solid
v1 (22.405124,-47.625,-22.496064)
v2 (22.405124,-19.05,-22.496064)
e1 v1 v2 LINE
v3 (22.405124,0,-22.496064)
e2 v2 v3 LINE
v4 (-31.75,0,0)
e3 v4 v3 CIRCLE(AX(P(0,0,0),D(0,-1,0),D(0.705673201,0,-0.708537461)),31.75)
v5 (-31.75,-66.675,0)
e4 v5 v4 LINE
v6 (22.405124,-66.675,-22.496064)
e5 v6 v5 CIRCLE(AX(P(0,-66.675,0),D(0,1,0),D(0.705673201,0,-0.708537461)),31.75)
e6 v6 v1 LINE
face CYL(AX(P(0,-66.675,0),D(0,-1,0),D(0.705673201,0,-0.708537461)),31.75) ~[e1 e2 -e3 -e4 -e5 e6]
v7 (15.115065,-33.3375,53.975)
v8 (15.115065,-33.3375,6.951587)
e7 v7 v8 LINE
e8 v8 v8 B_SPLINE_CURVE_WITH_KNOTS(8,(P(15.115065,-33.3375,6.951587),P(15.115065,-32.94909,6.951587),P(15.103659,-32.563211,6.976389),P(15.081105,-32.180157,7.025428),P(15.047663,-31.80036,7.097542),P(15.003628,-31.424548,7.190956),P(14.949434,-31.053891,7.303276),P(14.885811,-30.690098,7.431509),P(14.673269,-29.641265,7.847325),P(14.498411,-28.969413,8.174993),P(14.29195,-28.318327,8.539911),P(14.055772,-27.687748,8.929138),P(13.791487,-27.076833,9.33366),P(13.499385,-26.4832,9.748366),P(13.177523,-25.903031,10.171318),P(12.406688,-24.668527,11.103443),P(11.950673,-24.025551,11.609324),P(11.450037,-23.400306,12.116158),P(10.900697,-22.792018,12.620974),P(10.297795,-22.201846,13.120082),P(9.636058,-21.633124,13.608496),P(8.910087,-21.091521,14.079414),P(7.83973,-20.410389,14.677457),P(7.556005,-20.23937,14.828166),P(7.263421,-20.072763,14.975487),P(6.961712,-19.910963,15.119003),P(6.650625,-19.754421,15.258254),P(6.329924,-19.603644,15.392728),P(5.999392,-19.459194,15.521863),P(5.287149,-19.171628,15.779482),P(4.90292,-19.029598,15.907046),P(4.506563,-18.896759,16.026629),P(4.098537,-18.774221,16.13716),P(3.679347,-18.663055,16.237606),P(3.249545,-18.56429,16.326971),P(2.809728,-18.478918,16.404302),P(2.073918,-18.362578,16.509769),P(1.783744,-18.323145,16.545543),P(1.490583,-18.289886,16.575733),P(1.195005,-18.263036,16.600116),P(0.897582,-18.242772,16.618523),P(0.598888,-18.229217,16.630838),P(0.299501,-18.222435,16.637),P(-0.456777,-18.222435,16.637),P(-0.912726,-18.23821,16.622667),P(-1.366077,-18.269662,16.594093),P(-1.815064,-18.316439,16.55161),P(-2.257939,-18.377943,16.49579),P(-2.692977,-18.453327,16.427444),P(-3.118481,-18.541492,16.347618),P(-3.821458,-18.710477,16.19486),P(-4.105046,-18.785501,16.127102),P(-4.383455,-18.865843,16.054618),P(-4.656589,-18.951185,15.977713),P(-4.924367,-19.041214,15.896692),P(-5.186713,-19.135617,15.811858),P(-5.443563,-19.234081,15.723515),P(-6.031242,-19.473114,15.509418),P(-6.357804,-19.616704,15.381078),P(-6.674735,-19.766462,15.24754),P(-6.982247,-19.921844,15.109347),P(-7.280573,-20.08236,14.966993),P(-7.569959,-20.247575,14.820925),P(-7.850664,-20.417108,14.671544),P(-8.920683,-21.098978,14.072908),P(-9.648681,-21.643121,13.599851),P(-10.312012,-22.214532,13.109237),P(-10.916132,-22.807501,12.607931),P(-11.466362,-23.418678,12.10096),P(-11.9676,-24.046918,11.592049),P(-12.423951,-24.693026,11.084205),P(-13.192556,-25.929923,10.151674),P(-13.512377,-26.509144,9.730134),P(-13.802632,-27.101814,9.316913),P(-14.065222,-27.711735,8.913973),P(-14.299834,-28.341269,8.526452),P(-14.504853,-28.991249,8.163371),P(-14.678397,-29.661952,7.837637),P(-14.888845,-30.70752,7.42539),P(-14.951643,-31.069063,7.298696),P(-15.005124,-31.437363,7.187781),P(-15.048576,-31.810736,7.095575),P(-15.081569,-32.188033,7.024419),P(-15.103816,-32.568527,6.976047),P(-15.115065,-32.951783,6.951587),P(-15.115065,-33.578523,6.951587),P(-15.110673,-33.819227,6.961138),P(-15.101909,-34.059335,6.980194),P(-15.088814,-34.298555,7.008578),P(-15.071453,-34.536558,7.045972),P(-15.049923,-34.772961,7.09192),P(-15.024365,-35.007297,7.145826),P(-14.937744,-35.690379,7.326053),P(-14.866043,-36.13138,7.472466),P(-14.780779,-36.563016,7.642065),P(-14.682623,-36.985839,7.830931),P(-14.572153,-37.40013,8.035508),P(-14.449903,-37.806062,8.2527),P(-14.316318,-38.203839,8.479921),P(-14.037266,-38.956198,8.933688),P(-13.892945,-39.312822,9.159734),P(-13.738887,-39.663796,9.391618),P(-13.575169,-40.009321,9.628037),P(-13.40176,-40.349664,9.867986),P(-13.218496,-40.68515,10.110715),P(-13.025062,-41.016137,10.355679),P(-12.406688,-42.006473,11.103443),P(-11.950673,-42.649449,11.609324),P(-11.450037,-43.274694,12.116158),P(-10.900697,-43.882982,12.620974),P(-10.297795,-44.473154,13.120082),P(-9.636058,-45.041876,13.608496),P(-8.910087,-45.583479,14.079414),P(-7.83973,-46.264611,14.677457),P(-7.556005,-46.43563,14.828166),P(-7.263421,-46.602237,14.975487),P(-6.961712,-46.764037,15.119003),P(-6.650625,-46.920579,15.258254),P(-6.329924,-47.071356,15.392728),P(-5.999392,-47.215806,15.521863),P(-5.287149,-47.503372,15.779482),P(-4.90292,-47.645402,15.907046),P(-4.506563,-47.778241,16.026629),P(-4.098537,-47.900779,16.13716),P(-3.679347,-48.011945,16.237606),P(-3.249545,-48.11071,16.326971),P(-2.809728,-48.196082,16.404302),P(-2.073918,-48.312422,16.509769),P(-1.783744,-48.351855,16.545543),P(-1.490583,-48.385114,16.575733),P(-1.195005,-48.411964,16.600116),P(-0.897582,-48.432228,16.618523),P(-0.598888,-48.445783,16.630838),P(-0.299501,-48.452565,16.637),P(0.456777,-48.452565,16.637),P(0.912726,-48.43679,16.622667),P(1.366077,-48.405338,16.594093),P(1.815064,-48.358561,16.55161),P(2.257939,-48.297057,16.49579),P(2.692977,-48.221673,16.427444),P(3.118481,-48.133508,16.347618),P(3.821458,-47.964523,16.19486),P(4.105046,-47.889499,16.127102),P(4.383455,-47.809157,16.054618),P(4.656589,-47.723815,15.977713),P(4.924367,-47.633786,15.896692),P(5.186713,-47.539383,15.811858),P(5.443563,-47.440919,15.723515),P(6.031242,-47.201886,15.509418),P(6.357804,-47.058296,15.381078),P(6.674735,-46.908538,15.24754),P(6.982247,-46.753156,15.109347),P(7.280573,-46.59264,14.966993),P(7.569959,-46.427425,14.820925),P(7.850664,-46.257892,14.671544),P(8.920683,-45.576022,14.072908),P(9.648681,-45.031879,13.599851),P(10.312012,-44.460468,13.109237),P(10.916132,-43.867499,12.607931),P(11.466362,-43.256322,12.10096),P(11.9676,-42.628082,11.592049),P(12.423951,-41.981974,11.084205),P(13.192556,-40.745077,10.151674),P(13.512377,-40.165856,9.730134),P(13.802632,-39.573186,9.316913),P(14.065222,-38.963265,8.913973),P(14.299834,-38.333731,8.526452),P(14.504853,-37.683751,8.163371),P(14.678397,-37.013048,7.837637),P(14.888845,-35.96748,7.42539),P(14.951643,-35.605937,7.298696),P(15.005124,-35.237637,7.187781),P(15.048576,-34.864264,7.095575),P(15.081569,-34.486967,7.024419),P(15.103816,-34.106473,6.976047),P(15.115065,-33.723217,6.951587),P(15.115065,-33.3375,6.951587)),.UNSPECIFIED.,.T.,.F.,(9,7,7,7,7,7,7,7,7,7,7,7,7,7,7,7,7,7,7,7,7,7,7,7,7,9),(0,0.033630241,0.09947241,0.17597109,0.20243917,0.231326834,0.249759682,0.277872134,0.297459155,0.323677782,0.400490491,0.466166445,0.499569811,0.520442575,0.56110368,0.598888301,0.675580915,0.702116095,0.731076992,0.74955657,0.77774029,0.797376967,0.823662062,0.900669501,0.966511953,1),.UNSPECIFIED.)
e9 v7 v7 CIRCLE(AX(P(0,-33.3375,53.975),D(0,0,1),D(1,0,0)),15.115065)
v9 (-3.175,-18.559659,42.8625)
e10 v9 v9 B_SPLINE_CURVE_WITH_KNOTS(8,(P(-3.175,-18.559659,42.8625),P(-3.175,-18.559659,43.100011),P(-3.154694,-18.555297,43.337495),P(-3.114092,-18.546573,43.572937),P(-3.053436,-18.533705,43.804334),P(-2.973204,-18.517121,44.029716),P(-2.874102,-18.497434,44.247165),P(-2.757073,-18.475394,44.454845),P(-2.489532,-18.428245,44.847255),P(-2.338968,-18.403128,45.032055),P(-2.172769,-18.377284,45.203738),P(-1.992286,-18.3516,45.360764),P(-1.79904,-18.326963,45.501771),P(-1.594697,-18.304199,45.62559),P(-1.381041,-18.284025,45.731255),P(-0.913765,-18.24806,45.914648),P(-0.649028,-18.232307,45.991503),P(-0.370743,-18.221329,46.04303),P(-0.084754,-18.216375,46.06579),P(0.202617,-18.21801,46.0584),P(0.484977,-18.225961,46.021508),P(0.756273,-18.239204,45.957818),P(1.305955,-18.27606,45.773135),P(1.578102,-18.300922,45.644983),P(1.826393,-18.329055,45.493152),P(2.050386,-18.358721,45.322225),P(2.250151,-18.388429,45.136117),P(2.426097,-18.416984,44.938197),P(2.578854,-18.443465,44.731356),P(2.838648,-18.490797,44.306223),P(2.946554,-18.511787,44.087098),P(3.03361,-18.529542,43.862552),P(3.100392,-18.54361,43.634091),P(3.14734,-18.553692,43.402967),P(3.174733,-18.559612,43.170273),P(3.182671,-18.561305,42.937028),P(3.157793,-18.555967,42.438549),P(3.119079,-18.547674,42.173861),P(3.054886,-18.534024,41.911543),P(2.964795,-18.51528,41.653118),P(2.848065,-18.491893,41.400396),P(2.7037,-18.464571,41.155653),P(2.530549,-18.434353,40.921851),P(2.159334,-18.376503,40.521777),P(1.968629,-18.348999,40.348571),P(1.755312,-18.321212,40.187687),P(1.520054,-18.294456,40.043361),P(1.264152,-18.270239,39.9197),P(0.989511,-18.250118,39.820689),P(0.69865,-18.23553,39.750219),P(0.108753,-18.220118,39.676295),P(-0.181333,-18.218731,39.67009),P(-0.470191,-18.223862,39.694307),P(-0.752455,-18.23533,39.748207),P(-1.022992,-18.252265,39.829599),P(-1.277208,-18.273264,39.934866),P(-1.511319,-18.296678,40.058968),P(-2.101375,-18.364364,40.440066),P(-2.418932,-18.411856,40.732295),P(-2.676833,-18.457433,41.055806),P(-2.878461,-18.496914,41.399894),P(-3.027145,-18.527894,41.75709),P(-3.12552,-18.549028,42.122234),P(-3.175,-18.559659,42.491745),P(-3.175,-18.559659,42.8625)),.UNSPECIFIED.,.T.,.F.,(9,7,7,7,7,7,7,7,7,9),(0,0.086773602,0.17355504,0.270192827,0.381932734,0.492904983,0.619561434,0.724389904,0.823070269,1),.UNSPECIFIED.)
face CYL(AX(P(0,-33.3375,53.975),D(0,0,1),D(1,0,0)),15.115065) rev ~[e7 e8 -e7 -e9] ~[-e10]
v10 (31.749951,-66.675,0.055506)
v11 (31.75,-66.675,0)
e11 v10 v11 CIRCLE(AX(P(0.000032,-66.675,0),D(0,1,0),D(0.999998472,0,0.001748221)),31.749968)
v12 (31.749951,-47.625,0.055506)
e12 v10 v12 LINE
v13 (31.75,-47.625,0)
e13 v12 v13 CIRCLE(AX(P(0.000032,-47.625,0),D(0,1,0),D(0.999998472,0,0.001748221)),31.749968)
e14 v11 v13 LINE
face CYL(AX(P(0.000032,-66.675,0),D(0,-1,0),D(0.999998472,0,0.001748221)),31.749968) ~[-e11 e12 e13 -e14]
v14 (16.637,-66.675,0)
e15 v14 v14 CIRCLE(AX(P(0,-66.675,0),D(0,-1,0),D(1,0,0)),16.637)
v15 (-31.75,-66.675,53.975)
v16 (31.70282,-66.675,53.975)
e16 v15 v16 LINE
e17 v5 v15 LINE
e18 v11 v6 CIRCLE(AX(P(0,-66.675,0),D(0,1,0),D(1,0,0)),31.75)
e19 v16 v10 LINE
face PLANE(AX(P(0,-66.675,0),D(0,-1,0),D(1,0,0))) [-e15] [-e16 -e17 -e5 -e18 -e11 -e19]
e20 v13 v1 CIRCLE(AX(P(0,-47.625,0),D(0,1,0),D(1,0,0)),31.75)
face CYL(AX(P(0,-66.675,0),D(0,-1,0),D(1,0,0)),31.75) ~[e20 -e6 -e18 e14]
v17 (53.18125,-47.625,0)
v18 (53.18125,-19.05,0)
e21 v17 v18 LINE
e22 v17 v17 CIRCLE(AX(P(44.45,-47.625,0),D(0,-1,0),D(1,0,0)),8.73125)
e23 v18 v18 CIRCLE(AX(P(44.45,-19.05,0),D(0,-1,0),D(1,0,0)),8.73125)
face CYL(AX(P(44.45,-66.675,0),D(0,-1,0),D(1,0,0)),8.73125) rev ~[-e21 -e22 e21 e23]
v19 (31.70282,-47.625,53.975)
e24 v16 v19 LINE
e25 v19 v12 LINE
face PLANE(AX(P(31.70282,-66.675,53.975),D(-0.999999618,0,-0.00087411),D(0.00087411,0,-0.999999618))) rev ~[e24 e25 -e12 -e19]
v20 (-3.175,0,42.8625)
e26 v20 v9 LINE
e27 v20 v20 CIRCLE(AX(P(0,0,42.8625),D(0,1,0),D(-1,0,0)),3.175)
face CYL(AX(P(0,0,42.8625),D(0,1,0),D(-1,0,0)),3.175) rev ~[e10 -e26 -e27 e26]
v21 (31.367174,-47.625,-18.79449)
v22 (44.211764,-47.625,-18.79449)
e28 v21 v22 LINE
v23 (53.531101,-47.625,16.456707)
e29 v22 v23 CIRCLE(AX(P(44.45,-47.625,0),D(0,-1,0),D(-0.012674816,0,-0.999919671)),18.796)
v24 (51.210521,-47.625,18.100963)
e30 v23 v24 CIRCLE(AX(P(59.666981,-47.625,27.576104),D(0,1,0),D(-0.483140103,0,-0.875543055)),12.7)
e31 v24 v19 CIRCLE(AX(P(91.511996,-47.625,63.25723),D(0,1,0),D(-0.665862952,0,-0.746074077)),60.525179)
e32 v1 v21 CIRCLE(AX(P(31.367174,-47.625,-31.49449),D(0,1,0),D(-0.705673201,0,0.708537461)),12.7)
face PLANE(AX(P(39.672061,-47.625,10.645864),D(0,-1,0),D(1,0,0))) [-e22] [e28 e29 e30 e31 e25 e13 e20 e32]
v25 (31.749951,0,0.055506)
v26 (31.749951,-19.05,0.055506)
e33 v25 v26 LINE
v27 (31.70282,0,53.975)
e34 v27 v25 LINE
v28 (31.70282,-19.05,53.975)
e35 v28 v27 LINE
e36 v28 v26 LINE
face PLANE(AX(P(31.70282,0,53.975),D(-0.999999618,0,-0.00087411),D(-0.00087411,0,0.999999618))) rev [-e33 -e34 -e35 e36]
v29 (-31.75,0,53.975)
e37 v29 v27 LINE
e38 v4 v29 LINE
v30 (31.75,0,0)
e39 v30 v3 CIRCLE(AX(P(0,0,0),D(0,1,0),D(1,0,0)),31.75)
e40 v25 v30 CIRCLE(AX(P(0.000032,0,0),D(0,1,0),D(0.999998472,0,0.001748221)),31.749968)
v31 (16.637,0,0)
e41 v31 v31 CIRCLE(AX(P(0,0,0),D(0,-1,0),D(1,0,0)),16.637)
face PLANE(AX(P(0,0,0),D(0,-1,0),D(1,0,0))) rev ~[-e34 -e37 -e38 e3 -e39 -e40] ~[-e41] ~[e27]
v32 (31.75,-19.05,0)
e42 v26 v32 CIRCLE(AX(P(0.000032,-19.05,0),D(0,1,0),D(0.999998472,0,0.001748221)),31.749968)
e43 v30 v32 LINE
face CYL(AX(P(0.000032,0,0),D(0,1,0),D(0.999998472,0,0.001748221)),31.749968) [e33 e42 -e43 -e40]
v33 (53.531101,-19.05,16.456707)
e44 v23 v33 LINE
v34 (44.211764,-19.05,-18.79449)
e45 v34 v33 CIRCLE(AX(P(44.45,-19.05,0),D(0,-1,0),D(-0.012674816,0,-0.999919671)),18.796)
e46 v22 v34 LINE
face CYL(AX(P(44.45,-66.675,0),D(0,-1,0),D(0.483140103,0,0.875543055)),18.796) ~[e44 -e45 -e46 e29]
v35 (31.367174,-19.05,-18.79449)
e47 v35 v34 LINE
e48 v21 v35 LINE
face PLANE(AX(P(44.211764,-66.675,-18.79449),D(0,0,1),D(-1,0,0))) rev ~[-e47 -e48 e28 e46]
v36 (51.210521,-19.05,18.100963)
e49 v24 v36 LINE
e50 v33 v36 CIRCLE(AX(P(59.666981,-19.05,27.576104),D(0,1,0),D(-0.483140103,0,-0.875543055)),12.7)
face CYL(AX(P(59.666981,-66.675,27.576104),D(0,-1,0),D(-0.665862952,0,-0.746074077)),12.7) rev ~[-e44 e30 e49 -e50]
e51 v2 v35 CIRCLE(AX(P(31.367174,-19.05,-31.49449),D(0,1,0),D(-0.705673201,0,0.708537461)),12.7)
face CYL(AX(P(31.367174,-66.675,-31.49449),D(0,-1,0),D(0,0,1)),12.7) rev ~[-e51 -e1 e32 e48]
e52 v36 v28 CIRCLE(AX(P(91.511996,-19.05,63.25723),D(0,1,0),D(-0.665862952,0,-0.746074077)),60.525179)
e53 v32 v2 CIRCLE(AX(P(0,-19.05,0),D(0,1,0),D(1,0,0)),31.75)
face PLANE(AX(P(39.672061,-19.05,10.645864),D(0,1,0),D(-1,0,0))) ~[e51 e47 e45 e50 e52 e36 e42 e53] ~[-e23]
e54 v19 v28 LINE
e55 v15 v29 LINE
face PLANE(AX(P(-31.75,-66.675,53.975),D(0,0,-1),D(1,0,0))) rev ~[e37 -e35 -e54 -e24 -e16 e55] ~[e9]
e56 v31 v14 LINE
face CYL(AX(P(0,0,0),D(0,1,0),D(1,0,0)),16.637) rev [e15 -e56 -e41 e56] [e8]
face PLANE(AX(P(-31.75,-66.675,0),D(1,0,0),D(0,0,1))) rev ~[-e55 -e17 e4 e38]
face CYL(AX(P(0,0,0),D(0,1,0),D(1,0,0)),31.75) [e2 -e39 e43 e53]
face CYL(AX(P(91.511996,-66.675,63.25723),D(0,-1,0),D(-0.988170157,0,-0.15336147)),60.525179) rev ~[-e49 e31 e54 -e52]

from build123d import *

# Parameters (mm, degrees)
F0_R      = 63.5
F0_R_2    = 16.637
F1_DEPTH  = 66.675
F2_R      = 63.5
F2_R_2    = 8.73125
F3_DEPTH  = 66.676
F4_R      = 8.73125
F5_DEPTH  = 19.05
F7_R      = 15.1150654982
F8_DEPTH  = 53.594
F9_R      = 3.175
F10_DEPTH = 25.4


# Not quite as in the source:
# - a pattern or mirror of a feature is missing from the dataset's text; its kind, count and spacing are read off the source's solid


with BuildPart() as f1:
    # F0 (on Front) → F1 (new body)
    with BuildSketch(Plane.XZ):
        Circle(F0_R)
        Circle(F0_R_2, mode=Mode.SUBTRACT)
    extrude(amount=F1_DEPTH)

    # F2 (on face) → F3 (cut, through all)
    with BuildSketch(Plane.XZ.offset(66.675)):
        Circle(F2_R)
        with BuildLine():
            Line((-31.75, 0), (-31.75, 53.975))
            Line((-31.75, 53.975), (31.7028198831, 53.975))
            ThreePointArc((31.7028198831, 53.975), (38.3398958316, 34.3431316591), (51.2105212065, 18.1009632644))
            ThreePointArc((51.2105212065, 18.1009632644), (52.3246389461, 17.2136710516), (53.5311013852, 16.4567072537))
            ThreePointArc((53.5311013852, 16.4567072537), (62.6217032006, -4.8040419219), (44.2117641598, -18.7944901416))
            Line((44.2117641598, -18.7944901416), (31.3671737764, -18.7944901416))
            ThreePointArc((31.3671737764, -18.7944901416), (26.5189786011, -19.756304441), (22.405124126, -22.4960643869))
            ThreePointArc((22.405124126, -22.4960643869), (-12.179897557, -29.3208559817), (-31.75, 0))
        make_face(mode=Mode.SUBTRACT)
        with Locations((44.45, 0)):
            Circle(F2_R_2)
    extrude(amount=-F3_DEPTH, mode=Mode.SUBTRACT)

    # F4 (on face) → F5 (cut)
    with BuildSketch(Plane.XZ.offset(66.675)):
        with BuildLine():
            Line((31.3671737764, -18.7944901416), (44.2117641598, -18.7944901416))
            ThreePointArc((44.2117641598, -18.7944901416), (62.6217032006, -4.8040419219), (53.5311013852, 16.4567072537))
            ThreePointArc((53.5311013852, 16.4567072537), (52.3246389461, 17.2136710516), (51.2105212065, 18.1009632644))
            ThreePointArc((51.2105212065, 18.1009632644), (38.3398958316, 34.3431316591), (31.7028198831, 53.975))
            Line((31.7028198831, 53.975), (31.7499514816, 0.0555059775))
            ThreePointArc((31.7499514816, 0.0555059775), (31.7499878704, 0.0277529994), (31.75, 0))
            ThreePointArc((31.75, 0), (29.3208559817, -12.179897557), (22.405124126, -22.4960643869))
            ThreePointArc((22.405124126, -22.4960643869), (26.5189786011, -19.756304441), (31.3671737764, -18.7944901416))
        make_face()
        with Locations((44.45, 0)):
            Circle(F4_R, mode=Mode.SUBTRACT)
    f5 = extrude(amount=-F5_DEPTH, mode=Mode.SUBTRACT)

    # F5_copies: F5 across plane
    add(f5.mirror(Plane.ZX.offset(-33.3375)), mode=Mode.SUBTRACT)

    # F7 (on face) → F8 (cut)
    with BuildSketch(Plane.XY.offset(53.975)):
        with Locations((0, -33.3375)):
            Circle(F7_R)
    extrude(amount=-F8_DEPTH, mode=Mode.SUBTRACT)

    # F9 (on face) → F10 (cut)
    with BuildSketch(Plane(origin=(0, 0, 0), x_dir=(-1, 0, 0), z_dir=(0, 1, 0))):
        with Locations((0, 42.8625)):
            Circle(F9_R)
    extrude(amount=-F10_DEPTH, mode=Mode.SUBTRACT)


solid = f1.part
